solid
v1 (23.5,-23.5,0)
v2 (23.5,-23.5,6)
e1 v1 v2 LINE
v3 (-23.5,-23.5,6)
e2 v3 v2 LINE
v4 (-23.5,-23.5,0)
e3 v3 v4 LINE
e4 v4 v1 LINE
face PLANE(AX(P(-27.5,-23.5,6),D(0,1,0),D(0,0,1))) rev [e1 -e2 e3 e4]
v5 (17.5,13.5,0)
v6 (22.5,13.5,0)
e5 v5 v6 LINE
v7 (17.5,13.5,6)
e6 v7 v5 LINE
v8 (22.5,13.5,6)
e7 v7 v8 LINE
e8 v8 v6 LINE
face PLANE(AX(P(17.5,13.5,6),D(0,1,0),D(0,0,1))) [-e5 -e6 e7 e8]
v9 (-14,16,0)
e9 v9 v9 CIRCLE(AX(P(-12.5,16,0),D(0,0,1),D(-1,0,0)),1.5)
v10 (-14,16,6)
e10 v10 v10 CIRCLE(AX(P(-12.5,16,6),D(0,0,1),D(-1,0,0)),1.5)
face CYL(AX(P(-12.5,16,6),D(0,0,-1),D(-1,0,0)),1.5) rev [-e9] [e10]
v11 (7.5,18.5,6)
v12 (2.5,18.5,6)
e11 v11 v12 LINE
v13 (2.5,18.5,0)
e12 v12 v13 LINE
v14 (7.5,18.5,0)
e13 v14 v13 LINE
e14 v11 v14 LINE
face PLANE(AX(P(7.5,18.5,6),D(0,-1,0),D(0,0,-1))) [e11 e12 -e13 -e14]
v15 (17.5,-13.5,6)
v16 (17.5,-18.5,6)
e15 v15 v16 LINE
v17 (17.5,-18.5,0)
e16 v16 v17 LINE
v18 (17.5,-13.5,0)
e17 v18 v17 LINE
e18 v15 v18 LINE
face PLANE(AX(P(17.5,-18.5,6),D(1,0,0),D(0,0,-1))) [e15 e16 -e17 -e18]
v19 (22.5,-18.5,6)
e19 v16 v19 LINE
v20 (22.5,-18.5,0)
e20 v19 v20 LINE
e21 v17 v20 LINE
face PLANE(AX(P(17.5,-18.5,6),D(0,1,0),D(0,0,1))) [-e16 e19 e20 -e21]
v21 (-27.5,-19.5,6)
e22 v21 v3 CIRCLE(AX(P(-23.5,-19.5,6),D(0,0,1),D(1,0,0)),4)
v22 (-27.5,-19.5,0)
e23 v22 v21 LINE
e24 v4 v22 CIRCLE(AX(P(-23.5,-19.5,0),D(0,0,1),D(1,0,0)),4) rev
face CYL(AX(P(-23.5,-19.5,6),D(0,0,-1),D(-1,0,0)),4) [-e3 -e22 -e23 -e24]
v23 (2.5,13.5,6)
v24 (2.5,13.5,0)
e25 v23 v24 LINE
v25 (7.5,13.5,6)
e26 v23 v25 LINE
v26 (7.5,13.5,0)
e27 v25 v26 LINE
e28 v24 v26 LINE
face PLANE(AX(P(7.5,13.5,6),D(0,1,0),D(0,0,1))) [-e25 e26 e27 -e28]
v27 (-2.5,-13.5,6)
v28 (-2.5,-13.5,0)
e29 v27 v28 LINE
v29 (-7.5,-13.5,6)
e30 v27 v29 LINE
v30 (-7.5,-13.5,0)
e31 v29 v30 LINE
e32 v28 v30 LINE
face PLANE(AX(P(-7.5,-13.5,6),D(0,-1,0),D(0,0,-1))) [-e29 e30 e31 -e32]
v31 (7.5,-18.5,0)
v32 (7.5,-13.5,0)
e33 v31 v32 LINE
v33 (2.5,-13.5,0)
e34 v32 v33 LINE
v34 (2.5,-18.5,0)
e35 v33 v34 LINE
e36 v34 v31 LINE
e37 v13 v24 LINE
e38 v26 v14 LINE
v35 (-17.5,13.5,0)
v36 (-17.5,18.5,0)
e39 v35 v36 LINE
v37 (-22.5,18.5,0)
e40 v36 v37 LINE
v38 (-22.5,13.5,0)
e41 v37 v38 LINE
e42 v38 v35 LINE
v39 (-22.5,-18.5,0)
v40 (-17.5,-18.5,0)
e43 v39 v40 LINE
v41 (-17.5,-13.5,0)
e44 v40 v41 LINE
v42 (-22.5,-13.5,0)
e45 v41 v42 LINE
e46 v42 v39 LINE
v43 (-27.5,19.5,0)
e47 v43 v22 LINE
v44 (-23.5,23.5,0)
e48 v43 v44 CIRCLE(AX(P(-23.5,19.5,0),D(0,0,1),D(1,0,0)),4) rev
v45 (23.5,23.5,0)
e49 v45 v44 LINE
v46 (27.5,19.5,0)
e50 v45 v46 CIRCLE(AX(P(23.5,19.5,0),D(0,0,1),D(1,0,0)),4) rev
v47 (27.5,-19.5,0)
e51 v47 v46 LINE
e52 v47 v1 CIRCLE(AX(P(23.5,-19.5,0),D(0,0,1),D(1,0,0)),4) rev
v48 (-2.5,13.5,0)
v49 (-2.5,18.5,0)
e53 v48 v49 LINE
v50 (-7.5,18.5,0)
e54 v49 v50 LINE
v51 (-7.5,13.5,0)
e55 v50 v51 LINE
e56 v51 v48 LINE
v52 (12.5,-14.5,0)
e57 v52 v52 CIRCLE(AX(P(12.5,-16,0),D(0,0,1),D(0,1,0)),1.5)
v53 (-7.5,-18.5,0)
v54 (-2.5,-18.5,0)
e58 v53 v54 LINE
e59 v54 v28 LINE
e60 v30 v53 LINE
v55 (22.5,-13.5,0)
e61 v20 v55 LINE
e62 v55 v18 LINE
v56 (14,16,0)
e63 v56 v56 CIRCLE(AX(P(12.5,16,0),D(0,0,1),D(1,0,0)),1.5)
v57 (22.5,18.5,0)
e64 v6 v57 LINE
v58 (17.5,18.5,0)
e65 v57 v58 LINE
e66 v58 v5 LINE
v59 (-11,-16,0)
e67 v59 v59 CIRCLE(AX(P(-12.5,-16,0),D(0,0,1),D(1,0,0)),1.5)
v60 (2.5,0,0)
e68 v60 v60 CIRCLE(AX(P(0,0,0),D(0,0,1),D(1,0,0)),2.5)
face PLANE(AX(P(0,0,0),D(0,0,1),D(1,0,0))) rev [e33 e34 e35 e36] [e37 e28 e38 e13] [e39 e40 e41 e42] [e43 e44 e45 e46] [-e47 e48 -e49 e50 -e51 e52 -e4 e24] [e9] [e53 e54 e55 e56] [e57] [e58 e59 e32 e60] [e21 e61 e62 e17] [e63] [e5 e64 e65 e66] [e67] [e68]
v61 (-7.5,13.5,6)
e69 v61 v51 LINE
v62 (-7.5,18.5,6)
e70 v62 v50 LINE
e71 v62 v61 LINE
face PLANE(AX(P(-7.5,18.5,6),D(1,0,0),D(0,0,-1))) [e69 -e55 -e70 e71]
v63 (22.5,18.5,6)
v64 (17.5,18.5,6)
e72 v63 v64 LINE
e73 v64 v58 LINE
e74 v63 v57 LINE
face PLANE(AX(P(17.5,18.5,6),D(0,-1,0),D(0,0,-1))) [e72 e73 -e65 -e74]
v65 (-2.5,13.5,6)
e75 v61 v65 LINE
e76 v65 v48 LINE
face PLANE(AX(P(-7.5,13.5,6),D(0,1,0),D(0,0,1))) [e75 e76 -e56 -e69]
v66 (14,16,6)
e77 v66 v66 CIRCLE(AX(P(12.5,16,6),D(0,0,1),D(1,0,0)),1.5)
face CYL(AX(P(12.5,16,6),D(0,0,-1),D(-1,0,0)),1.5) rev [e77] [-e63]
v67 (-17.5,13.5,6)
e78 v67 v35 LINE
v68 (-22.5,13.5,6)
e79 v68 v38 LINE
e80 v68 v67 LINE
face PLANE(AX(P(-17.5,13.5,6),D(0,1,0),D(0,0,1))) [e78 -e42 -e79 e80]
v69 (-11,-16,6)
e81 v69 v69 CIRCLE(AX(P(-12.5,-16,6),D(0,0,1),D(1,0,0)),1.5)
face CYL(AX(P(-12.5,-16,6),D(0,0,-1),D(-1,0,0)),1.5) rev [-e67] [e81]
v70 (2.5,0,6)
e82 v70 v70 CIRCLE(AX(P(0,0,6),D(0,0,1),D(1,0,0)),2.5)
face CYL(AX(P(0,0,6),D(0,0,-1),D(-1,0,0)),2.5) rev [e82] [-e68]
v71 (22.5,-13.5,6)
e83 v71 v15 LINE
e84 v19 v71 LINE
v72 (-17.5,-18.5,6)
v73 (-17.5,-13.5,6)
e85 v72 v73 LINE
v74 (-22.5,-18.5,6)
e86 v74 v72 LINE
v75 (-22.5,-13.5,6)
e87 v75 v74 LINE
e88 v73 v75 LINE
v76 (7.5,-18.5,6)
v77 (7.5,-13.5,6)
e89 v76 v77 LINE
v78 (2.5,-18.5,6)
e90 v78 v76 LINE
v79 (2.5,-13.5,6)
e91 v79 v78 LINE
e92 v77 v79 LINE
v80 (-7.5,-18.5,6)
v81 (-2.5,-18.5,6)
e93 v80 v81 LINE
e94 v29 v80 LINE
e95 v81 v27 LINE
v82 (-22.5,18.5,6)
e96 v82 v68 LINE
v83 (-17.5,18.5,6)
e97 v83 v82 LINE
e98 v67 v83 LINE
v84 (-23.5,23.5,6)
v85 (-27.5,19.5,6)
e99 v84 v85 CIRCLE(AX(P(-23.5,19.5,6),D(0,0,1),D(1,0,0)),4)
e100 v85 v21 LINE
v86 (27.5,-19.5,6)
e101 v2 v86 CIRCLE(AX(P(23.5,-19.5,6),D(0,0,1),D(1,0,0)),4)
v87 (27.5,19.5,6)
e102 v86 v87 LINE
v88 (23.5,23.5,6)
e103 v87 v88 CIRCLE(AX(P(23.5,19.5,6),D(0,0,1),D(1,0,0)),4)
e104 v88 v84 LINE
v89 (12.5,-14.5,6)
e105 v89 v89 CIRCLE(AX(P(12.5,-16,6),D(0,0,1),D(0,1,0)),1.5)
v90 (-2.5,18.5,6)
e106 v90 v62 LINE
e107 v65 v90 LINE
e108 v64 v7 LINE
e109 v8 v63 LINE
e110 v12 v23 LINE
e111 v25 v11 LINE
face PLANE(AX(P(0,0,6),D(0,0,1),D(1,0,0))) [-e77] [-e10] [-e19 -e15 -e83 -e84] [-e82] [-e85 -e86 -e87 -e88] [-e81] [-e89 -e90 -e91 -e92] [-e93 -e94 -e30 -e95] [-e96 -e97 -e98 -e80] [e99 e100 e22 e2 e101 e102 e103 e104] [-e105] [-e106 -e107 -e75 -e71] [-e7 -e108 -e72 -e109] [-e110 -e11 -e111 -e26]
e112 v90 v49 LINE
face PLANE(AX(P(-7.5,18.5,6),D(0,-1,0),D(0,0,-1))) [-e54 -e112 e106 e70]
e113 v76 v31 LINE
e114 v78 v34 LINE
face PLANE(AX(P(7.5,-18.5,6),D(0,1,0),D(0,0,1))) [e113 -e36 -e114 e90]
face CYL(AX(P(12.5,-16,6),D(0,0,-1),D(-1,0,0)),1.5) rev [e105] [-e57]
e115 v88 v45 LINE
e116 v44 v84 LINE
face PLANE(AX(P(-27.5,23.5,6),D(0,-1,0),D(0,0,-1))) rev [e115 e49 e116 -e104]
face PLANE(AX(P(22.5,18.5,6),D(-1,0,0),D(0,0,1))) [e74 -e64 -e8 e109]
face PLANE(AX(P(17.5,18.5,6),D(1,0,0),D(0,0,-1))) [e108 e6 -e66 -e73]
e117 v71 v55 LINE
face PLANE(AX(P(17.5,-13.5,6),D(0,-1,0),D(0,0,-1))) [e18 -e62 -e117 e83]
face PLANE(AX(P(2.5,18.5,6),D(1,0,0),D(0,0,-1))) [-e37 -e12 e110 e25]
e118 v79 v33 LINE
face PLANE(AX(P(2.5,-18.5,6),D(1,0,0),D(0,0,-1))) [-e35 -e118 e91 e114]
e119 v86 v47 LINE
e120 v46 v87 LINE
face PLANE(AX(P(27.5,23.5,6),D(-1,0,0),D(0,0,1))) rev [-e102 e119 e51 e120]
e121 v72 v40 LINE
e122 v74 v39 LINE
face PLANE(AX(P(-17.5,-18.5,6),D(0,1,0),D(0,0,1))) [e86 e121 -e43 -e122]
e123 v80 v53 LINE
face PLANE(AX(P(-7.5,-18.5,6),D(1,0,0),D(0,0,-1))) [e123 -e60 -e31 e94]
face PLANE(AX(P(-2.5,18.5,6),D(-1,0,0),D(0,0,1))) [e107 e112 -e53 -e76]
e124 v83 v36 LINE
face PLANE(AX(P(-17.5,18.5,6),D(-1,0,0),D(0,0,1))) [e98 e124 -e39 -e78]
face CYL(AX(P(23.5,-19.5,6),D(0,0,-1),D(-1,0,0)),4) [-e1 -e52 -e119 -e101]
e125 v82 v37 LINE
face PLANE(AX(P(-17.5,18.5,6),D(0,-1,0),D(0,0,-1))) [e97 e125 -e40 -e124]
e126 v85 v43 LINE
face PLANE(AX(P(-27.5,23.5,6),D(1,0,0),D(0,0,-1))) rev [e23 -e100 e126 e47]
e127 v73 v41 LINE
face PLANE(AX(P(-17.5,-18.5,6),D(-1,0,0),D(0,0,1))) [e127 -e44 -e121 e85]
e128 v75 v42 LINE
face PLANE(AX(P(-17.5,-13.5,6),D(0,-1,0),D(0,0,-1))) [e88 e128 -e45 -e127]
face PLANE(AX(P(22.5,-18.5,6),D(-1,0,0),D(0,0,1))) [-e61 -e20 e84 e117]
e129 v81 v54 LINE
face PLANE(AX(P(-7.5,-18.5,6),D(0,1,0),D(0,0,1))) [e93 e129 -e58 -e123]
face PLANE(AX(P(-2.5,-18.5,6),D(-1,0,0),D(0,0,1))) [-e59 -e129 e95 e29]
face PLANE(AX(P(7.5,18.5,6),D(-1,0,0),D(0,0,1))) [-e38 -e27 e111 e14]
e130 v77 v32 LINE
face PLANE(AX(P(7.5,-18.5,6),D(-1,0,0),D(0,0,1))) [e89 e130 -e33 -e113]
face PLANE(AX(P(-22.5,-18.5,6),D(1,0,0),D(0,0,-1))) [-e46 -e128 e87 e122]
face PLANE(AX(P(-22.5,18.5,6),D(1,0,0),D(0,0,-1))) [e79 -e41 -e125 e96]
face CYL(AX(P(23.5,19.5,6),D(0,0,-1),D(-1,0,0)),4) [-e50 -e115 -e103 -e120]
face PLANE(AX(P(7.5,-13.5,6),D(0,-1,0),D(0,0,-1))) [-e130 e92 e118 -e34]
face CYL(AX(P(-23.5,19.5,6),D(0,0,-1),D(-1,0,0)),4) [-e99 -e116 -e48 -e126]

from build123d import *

# Parameters (mm, degrees)
BOSS_EXTRU_1_OUTLINE_W   = 55
BOSS_EXTRU_1_OUTLINE_H   = 47
BOSS_EXTRU_1_OUTLINE_W_2 = 5
BOSS_EXTRU_1_OUTLINE_H_2 = 5
BOSS_EXTRU_1_OUTLINE_R   = 1.5
BOSS_EXTRU_1_OUTLINE_R_2 = 2.5
BOSS_EXTRU_1_DEPTH       = 6
CONG_1_R                 = 4


# Read off the part's stored shape, not the designer's step: Boss.-Extru.1
with BuildPart() as part:
    # Boss.-Extru.1 outline → Boss.-Extru.1 (new body)
    with BuildSketch(Plane.XY):
        Rectangle(BOSS_EXTRU_1_OUTLINE_W, BOSS_EXTRU_1_OUTLINE_H)
        with Locations((-20, -16)):
            Rectangle(BOSS_EXTRU_1_OUTLINE_W_2, BOSS_EXTRU_1_OUTLINE_H_2, mode=Mode.SUBTRACT)
        with Locations((-12.5, -16)):
            Circle(BOSS_EXTRU_1_OUTLINE_R, mode=Mode.SUBTRACT)
        with Locations((-5, -16)):
            Rectangle(BOSS_EXTRU_1_OUTLINE_W_2, BOSS_EXTRU_1_OUTLINE_H_2, mode=Mode.SUBTRACT)
        with Locations((5, -16)):
            Rectangle(BOSS_EXTRU_1_OUTLINE_W_2, BOSS_EXTRU_1_OUTLINE_H_2, mode=Mode.SUBTRACT)
        with Locations((12.5, -16)):
            Circle(BOSS_EXTRU_1_OUTLINE_R, mode=Mode.SUBTRACT)
        with Locations((20, -16)):
            Rectangle(BOSS_EXTRU_1_OUTLINE_W_2, BOSS_EXTRU_1_OUTLINE_H_2, mode=Mode.SUBTRACT)
        with Locations((-20, 16)):
            Rectangle(BOSS_EXTRU_1_OUTLINE_W_2, BOSS_EXTRU_1_OUTLINE_H_2, mode=Mode.SUBTRACT)
        with Locations((-12.5, 16)):
            Circle(BOSS_EXTRU_1_OUTLINE_R, mode=Mode.SUBTRACT)
        with Locations((-5, 16)):
            Rectangle(BOSS_EXTRU_1_OUTLINE_W_2, BOSS_EXTRU_1_OUTLINE_H_2, mode=Mode.SUBTRACT)
        Circle(BOSS_EXTRU_1_OUTLINE_R_2, mode=Mode.SUBTRACT)
        with Locations((5, 16)):
            Rectangle(BOSS_EXTRU_1_OUTLINE_W_2, BOSS_EXTRU_1_OUTLINE_H_2, mode=Mode.SUBTRACT)
        with Locations((12.5, 16)):
            Circle(BOSS_EXTRU_1_OUTLINE_R, mode=Mode.SUBTRACT)
        with Locations((20, 16)):
            Rectangle(BOSS_EXTRU_1_OUTLINE_W_2, BOSS_EXTRU_1_OUTLINE_H_2, mode=Mode.SUBTRACT)
    extrude(amount=BOSS_EXTRU_1_DEPTH)

    # Congé1
    cong_1_edges = [part.edges().sort_by_distance(p)[0] for p in [
        (-27.5, 23.5, 3),
        (27.5, 23.5, 3),
        (27.5, -23.5, 3),
        (-27.5, -23.5, 3),
    ]]
    fillet(cong_1_edges, radius=CONG_1_R)


solid = part.part
